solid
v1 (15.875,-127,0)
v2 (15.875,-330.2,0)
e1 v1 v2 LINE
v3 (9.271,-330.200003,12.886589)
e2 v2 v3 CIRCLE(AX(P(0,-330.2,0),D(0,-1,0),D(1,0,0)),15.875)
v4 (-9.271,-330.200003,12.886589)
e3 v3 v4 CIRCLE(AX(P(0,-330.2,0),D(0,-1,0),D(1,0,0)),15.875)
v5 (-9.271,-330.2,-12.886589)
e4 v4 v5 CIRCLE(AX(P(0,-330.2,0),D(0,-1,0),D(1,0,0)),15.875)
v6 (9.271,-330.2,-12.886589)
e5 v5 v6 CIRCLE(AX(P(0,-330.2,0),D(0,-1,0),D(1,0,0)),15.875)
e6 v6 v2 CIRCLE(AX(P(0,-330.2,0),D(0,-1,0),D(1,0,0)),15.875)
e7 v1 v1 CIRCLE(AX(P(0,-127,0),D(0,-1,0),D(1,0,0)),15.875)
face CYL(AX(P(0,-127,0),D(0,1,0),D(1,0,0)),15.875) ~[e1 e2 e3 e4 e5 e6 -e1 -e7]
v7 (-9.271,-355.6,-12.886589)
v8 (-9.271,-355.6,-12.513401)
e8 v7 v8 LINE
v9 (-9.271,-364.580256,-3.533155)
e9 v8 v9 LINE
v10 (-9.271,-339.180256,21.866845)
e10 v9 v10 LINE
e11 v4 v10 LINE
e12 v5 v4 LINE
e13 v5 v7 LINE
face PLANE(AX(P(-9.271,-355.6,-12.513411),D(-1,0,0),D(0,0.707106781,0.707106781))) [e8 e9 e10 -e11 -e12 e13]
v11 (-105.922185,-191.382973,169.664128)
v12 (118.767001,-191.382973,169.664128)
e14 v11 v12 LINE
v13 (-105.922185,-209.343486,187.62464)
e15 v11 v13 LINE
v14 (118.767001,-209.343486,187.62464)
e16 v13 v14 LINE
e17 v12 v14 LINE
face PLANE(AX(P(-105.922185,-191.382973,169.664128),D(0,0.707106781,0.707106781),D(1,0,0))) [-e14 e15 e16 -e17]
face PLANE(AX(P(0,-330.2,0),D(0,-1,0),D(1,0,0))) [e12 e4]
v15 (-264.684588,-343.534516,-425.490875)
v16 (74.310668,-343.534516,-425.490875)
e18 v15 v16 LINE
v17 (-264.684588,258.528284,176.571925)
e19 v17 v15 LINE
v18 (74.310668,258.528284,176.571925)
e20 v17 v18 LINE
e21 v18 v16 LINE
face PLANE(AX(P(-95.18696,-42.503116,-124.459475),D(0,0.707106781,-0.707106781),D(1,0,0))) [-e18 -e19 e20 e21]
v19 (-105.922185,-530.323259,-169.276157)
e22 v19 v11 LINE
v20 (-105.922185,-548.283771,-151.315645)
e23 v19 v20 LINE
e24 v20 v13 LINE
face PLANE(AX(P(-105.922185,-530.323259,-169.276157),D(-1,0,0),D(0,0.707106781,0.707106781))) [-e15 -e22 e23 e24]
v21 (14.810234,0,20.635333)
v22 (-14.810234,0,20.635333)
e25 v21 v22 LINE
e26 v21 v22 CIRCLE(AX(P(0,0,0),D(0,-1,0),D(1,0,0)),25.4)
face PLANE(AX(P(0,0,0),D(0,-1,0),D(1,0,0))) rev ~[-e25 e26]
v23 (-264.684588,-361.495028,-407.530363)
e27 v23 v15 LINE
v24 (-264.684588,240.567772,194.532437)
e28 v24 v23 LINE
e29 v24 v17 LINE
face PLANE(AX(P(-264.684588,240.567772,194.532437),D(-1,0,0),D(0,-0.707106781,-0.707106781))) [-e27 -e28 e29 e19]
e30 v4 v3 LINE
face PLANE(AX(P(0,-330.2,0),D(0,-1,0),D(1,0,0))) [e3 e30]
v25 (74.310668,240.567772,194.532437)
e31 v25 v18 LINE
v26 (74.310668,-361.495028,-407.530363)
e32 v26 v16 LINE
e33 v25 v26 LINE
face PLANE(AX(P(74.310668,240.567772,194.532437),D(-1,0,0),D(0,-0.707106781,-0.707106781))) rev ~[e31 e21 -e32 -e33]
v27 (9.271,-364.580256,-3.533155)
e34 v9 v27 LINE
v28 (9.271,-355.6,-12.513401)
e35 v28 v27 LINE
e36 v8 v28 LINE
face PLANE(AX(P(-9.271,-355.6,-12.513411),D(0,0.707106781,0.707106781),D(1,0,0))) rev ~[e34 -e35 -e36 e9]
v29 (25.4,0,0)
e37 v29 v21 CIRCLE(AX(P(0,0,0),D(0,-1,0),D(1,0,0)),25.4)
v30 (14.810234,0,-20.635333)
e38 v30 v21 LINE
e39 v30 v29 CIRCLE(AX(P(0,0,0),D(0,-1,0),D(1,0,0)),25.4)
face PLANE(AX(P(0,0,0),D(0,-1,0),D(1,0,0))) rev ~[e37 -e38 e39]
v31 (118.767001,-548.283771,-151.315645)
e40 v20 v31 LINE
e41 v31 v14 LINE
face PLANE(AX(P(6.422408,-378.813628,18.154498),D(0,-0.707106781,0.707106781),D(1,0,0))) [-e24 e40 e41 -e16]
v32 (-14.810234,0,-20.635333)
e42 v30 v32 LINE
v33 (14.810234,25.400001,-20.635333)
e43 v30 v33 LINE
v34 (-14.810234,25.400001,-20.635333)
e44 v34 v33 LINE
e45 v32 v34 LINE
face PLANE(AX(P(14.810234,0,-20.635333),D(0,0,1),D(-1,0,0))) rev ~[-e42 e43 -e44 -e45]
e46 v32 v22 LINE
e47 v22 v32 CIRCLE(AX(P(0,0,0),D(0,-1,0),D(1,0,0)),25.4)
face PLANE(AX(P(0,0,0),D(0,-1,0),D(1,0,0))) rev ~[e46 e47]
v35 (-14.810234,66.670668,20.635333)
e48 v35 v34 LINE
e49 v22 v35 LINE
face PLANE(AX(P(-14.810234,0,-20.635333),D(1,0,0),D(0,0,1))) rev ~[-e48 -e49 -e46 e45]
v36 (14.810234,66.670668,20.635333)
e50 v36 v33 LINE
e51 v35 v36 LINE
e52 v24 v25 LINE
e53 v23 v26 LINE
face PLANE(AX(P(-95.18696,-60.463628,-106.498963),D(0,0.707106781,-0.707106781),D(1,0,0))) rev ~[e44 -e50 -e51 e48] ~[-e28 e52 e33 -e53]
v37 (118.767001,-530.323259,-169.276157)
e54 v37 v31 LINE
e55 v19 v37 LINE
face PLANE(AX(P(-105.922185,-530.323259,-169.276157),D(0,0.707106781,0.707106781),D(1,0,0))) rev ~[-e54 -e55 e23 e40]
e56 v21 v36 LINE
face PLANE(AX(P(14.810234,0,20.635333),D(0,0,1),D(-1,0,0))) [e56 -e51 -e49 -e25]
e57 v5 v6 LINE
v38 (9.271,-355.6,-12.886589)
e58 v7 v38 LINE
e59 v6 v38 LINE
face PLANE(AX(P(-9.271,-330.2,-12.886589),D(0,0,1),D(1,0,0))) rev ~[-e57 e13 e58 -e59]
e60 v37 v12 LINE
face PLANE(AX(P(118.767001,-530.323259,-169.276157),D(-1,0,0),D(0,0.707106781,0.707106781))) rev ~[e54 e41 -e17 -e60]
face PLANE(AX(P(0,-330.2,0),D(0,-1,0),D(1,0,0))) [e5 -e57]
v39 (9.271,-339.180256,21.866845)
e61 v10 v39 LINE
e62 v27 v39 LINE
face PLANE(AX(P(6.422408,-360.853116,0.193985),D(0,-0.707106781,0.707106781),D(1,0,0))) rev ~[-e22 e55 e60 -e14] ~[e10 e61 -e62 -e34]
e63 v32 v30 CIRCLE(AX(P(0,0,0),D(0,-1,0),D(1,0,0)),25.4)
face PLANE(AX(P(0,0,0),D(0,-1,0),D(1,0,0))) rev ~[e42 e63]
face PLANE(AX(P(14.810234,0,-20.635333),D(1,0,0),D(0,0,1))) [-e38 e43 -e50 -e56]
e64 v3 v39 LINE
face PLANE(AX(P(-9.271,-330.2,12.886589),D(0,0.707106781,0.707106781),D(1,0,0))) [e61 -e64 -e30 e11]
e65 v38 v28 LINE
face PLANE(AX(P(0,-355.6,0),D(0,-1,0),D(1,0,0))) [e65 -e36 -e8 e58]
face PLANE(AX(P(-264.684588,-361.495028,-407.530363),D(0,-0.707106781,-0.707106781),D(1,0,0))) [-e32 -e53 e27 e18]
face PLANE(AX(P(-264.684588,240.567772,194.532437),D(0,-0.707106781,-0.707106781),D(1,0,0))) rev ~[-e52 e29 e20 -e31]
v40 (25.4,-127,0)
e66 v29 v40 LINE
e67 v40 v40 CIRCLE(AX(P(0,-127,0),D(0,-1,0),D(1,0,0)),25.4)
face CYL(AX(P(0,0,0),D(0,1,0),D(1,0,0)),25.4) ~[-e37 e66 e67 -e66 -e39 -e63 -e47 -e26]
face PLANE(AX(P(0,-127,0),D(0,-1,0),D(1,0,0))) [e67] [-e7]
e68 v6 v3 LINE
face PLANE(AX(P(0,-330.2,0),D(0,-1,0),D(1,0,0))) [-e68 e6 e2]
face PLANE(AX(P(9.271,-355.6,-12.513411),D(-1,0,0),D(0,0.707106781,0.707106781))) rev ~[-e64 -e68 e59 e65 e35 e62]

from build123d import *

# Parameters (mm, degrees)
F0_R         = 25.4
F1_DEPTH     = 127
F2_R         = 15.875
F3_DEPTH     = 203.2
F4_W         = 18.542
F4_H         = 25.7731786165
F5_DEPTH     = 25.4
F6_SIZE      = 25.39999
F7_W         = 18.542
F7_H         = 35.9210244843
F8_DEPTH     = 12.7
F9_W         = 29.620467016
F9_H         = 41.2706667472
F10_DEPTH    = 76.2
F11_T1_DEPTH = 290.9034585933
F12_W        = 224.6891856194
F12_H        = 479.333948344
F13_DEPTH    = 25.4
F14_W        = 338.9952555299
F14_H        = 851.445376873
F15_DEPTH    = 25.4


# Not quite as in the source:
# - a fillet or chamfer that OpenCascade refuses, or shapes differently, is made with other operations: its cross-section is extruded or revolved along the edge and cut away or added
# - a fillet or chamfer is up to 0.001 mm smaller than in the source, because OpenCascade refuses the exact size


with BuildPart() as f1:
    # F0 (on Front) → F1 (new body)
    with BuildSketch(Plane.XZ):
        Circle(F0_R)
    extrude(amount=F1_DEPTH)

    # F2 (on face) → F3 (join)
    with BuildSketch(Plane.XZ.offset(127)):
        Circle(F2_R)
    extrude(amount=F3_DEPTH)

    # F4 (on face) → F5 (join)
    with BuildSketch(Plane.XZ.offset(330.2)):
        Rectangle(F4_W, F4_H)
    extrude(amount=F5_DEPTH)

    # F6 (size 25.4 in the source; OpenCascade refuses exactly that, so slightly less here)
    f6_edges = [f1.edges().sort_by_distance(p)[0] for p in [
        (0, -355.6, 12.886589),
    ]]
    chamfer(f6_edges, length=F6_SIZE)

    # F7 (on face) → F8 (join)
    with BuildSketch(Plane(origin=(0, -171.5432946541, 171.5432946541), x_dir=(1, 0, 0), z_dir=(0, -0.7071067812, 0.7071067812))):
        with Locations((0, -242.3349767037)):
            Rectangle(F7_W, F7_H)
    extrude(amount=F8_DEPTH)

    # F9 (on face) → F10 (join)
    with BuildSketch(Plane(origin=(0, 0, 0), x_dir=(-1, 0, 0), z_dir=(0, 1, 0))):
        with Locations((-1.508e-06, -1.0823e-06)):
            Rectangle(F9_W, F9_H)
    extrude(amount=F10_DEPTH)

    # F11: chamfer of 50.8 on 1 edges, made by hand

    # F11_s2 → F11_t1 (cut)
    with BuildSketch(Plane.YZ.offset(-145.4517277887)):
        Polygon((25.4, -20.6353344559), (76.2, 30.1646655441), (76.2, -20.6353344559), align=None)
    extrude(amount=F11_T1_DEPTH, mode=Mode.SUBTRACT)

    # F12 (on face) → F13 (join)
    with BuildSketch(Plane(origin=(0, -180.5235507752, 180.5235507752), x_dir=(1, 0, 0), z_dir=(0, -0.7071067812, 0.7071067812))):
        with Locations((6.4224079251, -255.024516955)):
            Rectangle(F12_W, F12_H)
    extrude(amount=F13_DEPTH)

    # F14 (on face) → F15 (join)
    with BuildSketch(Plane(origin=(0, 23.0176672279, -23.0176672279), x_dir=(1, 0, 0), z_dir=(0, 0.7071067812, -0.7071067812))):
        with Locations((-95.1869599521, 118.0603802204)):
            Rectangle(F14_W, F14_H)
    extrude(amount=F15_DEPTH)


solid = f1.part
